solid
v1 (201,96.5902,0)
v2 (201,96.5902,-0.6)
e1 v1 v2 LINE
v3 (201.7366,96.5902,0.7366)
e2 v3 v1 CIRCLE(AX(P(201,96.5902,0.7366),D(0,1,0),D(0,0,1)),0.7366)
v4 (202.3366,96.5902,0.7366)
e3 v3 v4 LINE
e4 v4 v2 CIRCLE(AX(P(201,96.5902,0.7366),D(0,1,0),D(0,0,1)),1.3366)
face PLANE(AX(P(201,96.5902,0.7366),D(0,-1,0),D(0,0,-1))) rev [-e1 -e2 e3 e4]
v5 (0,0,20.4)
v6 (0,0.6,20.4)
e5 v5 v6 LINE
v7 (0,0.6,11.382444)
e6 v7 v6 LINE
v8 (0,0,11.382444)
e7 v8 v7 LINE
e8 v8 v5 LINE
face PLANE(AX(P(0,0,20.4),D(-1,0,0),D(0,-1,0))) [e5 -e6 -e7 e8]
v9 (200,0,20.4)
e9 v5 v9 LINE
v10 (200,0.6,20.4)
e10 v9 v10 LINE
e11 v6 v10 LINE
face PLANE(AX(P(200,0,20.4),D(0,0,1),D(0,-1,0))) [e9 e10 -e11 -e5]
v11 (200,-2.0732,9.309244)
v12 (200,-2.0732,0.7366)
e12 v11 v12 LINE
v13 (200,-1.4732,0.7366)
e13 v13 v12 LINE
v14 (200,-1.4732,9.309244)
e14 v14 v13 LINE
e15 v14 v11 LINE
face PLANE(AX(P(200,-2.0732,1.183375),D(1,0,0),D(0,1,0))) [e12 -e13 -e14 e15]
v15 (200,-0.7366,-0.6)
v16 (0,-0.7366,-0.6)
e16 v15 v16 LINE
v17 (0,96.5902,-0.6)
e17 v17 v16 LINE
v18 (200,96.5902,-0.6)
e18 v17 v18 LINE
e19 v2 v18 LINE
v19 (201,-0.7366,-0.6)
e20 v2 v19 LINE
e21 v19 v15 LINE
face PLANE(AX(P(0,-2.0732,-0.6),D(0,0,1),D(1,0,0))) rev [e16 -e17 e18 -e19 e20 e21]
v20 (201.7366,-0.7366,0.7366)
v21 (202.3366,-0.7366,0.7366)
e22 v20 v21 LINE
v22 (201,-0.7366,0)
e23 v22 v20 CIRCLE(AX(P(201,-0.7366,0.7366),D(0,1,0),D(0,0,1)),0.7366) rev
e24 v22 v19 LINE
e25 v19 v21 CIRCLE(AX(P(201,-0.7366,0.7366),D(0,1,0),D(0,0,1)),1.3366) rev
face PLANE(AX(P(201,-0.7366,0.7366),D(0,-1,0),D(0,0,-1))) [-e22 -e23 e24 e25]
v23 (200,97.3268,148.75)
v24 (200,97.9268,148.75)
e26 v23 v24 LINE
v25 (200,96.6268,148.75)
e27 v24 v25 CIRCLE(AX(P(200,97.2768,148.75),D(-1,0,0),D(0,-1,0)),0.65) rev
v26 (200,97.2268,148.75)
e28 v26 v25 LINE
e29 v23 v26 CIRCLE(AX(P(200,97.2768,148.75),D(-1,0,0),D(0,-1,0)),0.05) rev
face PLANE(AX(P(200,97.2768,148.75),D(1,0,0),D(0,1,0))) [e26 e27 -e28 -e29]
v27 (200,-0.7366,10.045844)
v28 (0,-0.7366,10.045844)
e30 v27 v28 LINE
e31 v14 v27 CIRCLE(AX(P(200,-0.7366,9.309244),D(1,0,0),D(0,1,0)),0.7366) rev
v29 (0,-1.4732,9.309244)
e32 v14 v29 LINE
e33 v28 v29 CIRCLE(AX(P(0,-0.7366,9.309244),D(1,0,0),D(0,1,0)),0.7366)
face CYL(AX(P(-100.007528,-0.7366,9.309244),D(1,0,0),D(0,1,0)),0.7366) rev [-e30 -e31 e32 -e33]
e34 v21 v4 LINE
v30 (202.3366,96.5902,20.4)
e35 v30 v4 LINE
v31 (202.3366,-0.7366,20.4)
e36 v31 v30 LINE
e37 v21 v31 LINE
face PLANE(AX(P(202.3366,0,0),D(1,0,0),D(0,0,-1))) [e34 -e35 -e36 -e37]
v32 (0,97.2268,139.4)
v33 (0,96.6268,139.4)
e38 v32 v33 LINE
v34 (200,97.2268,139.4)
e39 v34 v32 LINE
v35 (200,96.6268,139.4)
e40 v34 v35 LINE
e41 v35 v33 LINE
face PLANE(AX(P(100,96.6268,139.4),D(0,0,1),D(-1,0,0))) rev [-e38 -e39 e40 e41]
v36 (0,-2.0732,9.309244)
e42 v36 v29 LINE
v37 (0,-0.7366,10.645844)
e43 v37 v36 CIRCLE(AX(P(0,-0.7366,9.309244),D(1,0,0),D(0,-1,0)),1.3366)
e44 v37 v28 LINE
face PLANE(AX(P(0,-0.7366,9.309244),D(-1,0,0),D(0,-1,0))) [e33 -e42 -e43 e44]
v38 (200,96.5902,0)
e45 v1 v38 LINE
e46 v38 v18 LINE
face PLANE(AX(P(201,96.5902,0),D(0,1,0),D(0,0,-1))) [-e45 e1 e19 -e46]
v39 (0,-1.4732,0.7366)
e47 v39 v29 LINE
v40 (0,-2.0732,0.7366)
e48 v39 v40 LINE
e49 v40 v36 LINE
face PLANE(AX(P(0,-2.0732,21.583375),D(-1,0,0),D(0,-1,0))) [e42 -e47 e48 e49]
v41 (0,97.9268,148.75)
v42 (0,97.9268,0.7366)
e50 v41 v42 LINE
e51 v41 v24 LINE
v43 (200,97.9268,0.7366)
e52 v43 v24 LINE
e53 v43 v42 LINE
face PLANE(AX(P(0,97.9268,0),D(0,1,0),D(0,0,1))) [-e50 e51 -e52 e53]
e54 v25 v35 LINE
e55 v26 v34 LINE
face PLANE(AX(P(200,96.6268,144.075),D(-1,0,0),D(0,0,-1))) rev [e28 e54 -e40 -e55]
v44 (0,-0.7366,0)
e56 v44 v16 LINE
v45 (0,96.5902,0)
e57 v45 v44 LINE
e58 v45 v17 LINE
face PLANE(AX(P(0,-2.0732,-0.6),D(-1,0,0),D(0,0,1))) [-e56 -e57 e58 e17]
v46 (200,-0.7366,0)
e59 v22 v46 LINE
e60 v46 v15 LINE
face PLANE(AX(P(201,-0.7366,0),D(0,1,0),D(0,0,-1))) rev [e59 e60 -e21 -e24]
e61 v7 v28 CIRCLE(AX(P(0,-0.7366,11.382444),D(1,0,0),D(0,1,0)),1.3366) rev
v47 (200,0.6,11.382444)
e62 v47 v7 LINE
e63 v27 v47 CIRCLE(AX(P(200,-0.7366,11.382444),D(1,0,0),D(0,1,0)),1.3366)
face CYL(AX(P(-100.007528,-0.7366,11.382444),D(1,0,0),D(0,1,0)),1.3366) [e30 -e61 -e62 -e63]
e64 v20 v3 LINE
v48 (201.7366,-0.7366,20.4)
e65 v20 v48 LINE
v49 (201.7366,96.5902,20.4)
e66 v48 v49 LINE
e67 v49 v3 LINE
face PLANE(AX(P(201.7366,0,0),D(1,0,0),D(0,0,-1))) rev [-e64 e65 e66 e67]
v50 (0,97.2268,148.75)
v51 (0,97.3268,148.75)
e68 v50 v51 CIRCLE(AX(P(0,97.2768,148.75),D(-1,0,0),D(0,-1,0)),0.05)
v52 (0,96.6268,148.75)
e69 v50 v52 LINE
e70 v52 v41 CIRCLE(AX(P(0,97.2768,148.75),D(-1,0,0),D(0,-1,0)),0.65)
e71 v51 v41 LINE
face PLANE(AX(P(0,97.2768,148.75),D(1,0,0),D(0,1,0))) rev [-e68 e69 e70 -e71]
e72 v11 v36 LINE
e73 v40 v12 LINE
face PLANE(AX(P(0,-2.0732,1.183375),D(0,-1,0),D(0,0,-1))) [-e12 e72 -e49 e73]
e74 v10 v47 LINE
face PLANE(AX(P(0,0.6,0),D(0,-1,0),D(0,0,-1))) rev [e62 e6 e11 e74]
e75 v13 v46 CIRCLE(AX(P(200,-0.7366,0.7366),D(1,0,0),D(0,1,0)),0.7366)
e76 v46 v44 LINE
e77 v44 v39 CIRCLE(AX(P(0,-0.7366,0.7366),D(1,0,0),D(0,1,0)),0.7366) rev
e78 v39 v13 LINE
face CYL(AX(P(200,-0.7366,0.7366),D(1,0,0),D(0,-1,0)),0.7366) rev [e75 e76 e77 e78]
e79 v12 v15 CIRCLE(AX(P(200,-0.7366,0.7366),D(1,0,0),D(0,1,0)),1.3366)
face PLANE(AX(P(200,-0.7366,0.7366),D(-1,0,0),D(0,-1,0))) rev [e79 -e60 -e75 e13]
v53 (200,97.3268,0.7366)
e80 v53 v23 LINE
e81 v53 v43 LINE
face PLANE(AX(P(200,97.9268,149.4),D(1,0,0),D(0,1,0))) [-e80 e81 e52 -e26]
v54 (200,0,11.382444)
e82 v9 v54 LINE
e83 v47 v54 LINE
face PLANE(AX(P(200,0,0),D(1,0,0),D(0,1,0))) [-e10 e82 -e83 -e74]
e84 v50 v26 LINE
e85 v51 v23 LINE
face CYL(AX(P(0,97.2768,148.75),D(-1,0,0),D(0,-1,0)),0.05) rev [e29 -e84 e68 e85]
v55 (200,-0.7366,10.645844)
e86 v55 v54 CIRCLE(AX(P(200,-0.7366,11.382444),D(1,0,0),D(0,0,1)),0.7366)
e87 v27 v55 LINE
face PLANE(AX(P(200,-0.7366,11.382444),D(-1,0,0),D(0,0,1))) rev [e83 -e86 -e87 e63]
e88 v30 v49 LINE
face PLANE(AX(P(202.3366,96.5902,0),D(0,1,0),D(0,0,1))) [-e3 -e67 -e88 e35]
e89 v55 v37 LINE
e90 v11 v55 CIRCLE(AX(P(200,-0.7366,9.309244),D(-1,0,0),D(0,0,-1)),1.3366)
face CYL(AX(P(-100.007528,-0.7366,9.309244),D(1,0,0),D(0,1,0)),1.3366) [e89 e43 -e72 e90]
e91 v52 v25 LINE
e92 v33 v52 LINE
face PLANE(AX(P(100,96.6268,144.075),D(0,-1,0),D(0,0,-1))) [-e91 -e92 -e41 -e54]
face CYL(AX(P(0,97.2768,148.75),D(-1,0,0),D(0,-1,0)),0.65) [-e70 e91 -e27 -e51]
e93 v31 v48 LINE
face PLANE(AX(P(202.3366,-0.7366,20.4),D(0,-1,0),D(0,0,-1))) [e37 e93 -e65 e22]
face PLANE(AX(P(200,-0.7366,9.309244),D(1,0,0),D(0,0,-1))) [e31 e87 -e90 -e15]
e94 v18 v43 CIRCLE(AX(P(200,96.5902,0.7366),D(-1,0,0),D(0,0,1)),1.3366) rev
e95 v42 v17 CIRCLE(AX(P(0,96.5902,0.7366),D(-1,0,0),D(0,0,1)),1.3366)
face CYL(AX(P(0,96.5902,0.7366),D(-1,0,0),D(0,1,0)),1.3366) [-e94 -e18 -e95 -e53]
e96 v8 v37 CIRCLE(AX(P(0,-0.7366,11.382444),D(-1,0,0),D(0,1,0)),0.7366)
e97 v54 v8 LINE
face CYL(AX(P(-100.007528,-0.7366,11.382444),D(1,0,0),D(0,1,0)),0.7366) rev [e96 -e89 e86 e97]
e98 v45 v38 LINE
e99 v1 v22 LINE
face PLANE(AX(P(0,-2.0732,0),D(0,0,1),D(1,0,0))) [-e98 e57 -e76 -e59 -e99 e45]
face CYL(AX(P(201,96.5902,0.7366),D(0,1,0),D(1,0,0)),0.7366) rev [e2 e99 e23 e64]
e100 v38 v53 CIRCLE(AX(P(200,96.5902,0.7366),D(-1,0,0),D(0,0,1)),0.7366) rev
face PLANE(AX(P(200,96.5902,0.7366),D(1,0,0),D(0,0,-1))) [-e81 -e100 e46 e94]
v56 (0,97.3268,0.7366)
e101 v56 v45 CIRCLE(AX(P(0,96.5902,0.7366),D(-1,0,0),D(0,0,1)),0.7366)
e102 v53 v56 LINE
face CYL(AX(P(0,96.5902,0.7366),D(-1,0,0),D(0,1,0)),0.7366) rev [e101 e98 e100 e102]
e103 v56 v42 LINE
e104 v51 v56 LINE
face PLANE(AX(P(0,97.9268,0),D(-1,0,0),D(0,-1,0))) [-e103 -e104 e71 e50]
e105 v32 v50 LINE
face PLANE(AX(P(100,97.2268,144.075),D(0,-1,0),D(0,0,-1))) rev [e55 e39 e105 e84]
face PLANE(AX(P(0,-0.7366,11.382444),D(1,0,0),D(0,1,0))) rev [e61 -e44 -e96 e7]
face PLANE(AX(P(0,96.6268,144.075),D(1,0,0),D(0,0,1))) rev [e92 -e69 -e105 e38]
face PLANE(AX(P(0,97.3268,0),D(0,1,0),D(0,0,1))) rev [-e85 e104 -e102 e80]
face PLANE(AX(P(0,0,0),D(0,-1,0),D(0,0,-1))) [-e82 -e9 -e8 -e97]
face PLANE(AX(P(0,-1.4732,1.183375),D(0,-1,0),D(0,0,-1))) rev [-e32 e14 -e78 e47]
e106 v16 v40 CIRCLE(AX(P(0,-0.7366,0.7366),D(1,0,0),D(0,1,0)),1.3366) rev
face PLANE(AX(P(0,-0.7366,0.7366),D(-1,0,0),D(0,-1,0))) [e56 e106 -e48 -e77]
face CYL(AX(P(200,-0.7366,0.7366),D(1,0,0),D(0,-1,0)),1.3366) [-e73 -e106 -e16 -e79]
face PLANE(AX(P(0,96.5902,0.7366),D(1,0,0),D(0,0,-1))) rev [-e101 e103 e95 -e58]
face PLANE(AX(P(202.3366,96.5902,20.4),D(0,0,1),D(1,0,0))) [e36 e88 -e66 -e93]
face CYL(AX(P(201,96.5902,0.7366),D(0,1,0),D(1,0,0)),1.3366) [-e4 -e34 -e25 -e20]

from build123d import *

# Parameters (mm, degrees)
SKETCH1_W                    = 100
SKETCH1_H                    = 200
BASE_FLANGE1_DEPTH           = 0.6
EDGE_FLANGE1_STRIP_W         = 3.8732
EDGE_FLANGE1_STRIP_H         = 0.6
EDGE_FLANGE1_STRIP_CUT_DEPTH = 200
EDGE_FLANGE1_DEPTH           = 200
HEM1_DEPTH                   = 200
HEM1_2_DEPTH                 = 200
EDGE_FLANGE2_STRIP_W         = 3.8732
EDGE_FLANGE2_STRIP_H         = 0.6
EDGE_FLANGE2_STRIP_CUT_DEPTH = 200
EDGE_FLANGE2_DEPTH           = 200
JOG2_DEPTH                   = 200
JOG2_2_DEPTH                 = 200
EDGE_FLANGE4_DEPTH           = 97.3268


# Read off the part's stored shape, not the designer's step: Hem1, Jog2
# Sheet-metal steps are written as plain solids
with BuildPart() as part:
    # Sketch1 → Base-Flange1 (new body)
    with BuildSketch(Plane(origin=(0, 0, 0), x_dir=(0, 1, 0), z_dir=(0, 0, 1))):
        with Locations((50, -100)):
            Rectangle(SKETCH1_W, SKETCH1_H)
    extrude(amount=-BASE_FLANGE1_DEPTH)

    # Edge-Flange1 strip (across the edge) → Edge-Flange1 strip cut (cut)
    with BuildSketch(Plane(origin=(200, 100, 0), x_dir=(0, -1, 0), z_dir=(-1, 0, 0))):
        with Locations((-0.6, -0.3)):
            Rectangle(EDGE_FLANGE1_STRIP_W, EDGE_FLANGE1_STRIP_H)
    extrude(amount=EDGE_FLANGE1_STRIP_CUT_DEPTH, mode=Mode.SUBTRACT)

    # Edge-Flange1 section (across the edge) → Edge-Flange1 (add)
    with BuildSketch(Plane(origin=(200, 100, 0), x_dir=(0, -1, 0), z_dir=(-1, 0, 0))):
        with BuildLine():
            Line((0, 0.7366), (0, 149.4))
            Line((0, 149.4), (0.6, 149.4))
            Line((0.6, 149.4), (0.6, 0.7366))
            ThreePointArc((0.6, 0.7366), (0.815745145, 0.215745145), (1.3366, 0))
            Line((1.3366, 0), (1.3366, -0.6))
            ThreePointArc((1.3366, -0.6), (0.391481076, -0.208518924), (0, 0.7366))
        make_face()
    extrude(amount=EDGE_FLANGE1_DEPTH)

    # Hem1 outline → Hem1 (cut)
    with BuildSketch(Plane.YZ):
        with BuildLine():
            Line((99.4, 149.4), (99.4, 149.39807407))
            ThreePointArc((99.4, 149.39807407), (99.826969601, 149.191588043), (100, 148.75))
            Line((100, 148.75), (100, 149.4))
            Line((100, 149.4), (99.4, 149.4))
        make_face()
    extrude(amount=HEM1_DEPTH, mode=Mode.SUBTRACT)

    # Hem1 2 outline → Hem1 2 (add)
    with BuildSketch(Plane.YZ):
        with BuildLine():
            Line((98.7, 139.4), (99.3, 139.4))
            Line((99.3, 139.4), (99.3, 148.75))
            ThreePointArc((99.3, 148.75), (99.35, 148.8), (99.4, 148.75))
            Line((99.4, 148.75), (99.4, 149.39807407))
            ThreePointArc((99.4, 149.39807407), (98.908411957, 149.226969601), (98.7, 148.75))
            Line((98.7, 148.75), (98.7, 139.4))
        make_face()
    extrude(amount=HEM1_2_DEPTH)

    # Edge-Flange2 strip (across the edge) → Edge-Flange2 strip cut (cut)
    with BuildSketch(Plane.YZ):
        with Locations((-0.6, -0.3)):
            Rectangle(EDGE_FLANGE2_STRIP_W, EDGE_FLANGE2_STRIP_H)
    extrude(amount=EDGE_FLANGE2_STRIP_CUT_DEPTH, mode=Mode.SUBTRACT)

    # Edge-Flange2 section (across the edge) → Edge-Flange2 (add)
    with BuildSketch(Plane.YZ):
        with BuildLine():
            Line((0, 0.7366), (0, 20.4))
            Line((0, 20.4), (0.6, 20.4))
            Line((0.6, 20.4), (0.6, 0.7366))
            ThreePointArc((0.6, 0.7366), (0.815745145, 0.215745145), (1.3366, 0))
            Line((1.3366, 0), (1.3366, -0.6))
            ThreePointArc((1.3366, -0.6), (0.391481076, -0.208518924), (0, 0.7366))
        make_face()
    extrude(amount=EDGE_FLANGE2_DEPTH)

    # Jog2 outline → Jog2 (cut)
    with BuildSketch(Plane.YZ):
        with BuildLine():
            ThreePointArc((0.6, 11.382443736), (0.440480949, 10.74921392), (0, 10.26713212))
            Line((0, 10.26713212), (0, 0.7366))
            ThreePointArc((0, 0.7366), (0.056516982, 0.352039176), (0.221288384, 0))
            Line((0.221288384, 0), (1.3366, 0))
            ThreePointArc((1.3366, 0), (0.815745145, 0.215745145), (0.6, 0.7366))
            Line((0.6, 0.7366), (0.6, 11.382443736))
        make_face()
        with BuildLine():
            ThreePointArc((97.705511616, 0), (97.223429816, -0.440480949), (96.5902, -0.6))
            Line((96.5902, -0.6), (98.6634, -0.6))
            ThreePointArc((98.6634, -0.6), (99.608518924, -0.208518924), (100, 0.7366))
            Line((100, 0.7366), (100, 148.75))
            ThreePointArc((100, 148.75), (99.35, 149.4), (98.7, 148.75))
            Line((98.7, 148.75), (98.7, 139.4))
            Line((98.7, 139.4), (99.3, 139.4))
            Line((99.3, 139.4), (99.3, 148.75))
            ThreePointArc((99.3, 148.75), (99.35, 148.8), (99.4, 148.75))
            Line((99.4, 148.75), (99.4, 0.7366))
            ThreePointArc((99.4, 0.7366), (99.184254855, 0.215745145), (98.6634, 0))
            Line((98.6634, 0), (97.705511616, 0))
        make_face()
    extrude(amount=JOG2_DEPTH, mode=Mode.SUBTRACT)

    # Jog2 2 outline → Jog2 2 (add)
    with BuildSketch(Plane.YZ):
        with BuildLine():
            ThreePointArc((-0.7366, 10.645843736), (-1.681718924, 10.25436266), (-2.0732, 9.309243736))
            Line((-2.0732, 9.309243736), (-2.0732, 0.7366))
            ThreePointArc((-2.0732, 0.7366), (-1.681718924, -0.208518924), (-0.7366, -0.6))
            Line((-0.7366, -0.6), (1.3366, -0.6))
            ThreePointArc((1.3366, -0.6), (0.703370184, -0.440480949), (0.221288384, 0))
            Line((0.221288384, 0), (-0.7366, 0))
            ThreePointArc((-0.7366, 0), (-1.257454855, 0.215745145), (-1.4732, 0.7366))
            Line((-1.4732, 0.7366), (-1.4732, 9.309243736))
            ThreePointArc((-1.4732, 9.309243736), (-1.257454855, 9.830098591), (-0.7366, 10.045843736))
            ThreePointArc((-0.7366, 10.045843736), (-0.352039176, 10.102360718), (0, 10.26713212))
            Line((0, 10.26713212), (0, 11.382443736))
            ThreePointArc((0, 11.382443736), (-0.215745145, 10.861588881), (-0.7366, 10.645843736))
        make_face()
        with BuildLine():
            Line((96.5902, 0), (97.705511616, 0))
            ThreePointArc((97.705511616, 0), (97.870283018, 0.352039176), (97.9268, 0.7366))
            Line((97.9268, 0.7366), (97.9268, 148.75))
            ThreePointArc((97.9268, 148.75), (97.2768, 149.4), (96.6268, 148.75))
            Line((96.6268, 148.75), (96.6268, 139.4))
            Line((96.6268, 139.4), (97.2268, 139.4))
            Line((97.2268, 139.4), (97.2268, 148.75))
            ThreePointArc((97.2268, 148.75), (97.2768, 148.8), (97.3268, 148.75))
            Line((97.3268, 148.75), (97.3268, 0.7366))
            ThreePointArc((97.3268, 0.7366), (97.111054855, 0.215745145), (96.5902, 0))
        make_face()
    extrude(amount=JOG2_2_DEPTH)

    # Edge-Flange4 section (across the edge) → Edge-Flange4 (add)
    with BuildSketch(Plane(origin=(201.7366, -0.7366, 0), x_dir=(-1, 0, 0), z_dir=(0, 1, 0))):
        with BuildLine():
            Line((-0.6, 0.7366), (-0.6, 20.4))
            Line((-0.6, 20.4), (0, 20.4))
            Line((0, 20.4), (0, 0.7366))
            ThreePointArc((0, 0.7366), (0.215745145, 0.215745145), (0.7366, 0))
            Line((0.7366, 0), (1.7366, 0))
            Line((1.7366, 0), (1.7366, -0.6))
            Line((1.7366, -0.6), (0.7366, -0.6))
            ThreePointArc((0.7366, -0.6), (-0.208518924, -0.208518924), (-0.6, 0.7366))
        make_face()
    extrude(amount=EDGE_FLANGE4_DEPTH)


solid = part.part
